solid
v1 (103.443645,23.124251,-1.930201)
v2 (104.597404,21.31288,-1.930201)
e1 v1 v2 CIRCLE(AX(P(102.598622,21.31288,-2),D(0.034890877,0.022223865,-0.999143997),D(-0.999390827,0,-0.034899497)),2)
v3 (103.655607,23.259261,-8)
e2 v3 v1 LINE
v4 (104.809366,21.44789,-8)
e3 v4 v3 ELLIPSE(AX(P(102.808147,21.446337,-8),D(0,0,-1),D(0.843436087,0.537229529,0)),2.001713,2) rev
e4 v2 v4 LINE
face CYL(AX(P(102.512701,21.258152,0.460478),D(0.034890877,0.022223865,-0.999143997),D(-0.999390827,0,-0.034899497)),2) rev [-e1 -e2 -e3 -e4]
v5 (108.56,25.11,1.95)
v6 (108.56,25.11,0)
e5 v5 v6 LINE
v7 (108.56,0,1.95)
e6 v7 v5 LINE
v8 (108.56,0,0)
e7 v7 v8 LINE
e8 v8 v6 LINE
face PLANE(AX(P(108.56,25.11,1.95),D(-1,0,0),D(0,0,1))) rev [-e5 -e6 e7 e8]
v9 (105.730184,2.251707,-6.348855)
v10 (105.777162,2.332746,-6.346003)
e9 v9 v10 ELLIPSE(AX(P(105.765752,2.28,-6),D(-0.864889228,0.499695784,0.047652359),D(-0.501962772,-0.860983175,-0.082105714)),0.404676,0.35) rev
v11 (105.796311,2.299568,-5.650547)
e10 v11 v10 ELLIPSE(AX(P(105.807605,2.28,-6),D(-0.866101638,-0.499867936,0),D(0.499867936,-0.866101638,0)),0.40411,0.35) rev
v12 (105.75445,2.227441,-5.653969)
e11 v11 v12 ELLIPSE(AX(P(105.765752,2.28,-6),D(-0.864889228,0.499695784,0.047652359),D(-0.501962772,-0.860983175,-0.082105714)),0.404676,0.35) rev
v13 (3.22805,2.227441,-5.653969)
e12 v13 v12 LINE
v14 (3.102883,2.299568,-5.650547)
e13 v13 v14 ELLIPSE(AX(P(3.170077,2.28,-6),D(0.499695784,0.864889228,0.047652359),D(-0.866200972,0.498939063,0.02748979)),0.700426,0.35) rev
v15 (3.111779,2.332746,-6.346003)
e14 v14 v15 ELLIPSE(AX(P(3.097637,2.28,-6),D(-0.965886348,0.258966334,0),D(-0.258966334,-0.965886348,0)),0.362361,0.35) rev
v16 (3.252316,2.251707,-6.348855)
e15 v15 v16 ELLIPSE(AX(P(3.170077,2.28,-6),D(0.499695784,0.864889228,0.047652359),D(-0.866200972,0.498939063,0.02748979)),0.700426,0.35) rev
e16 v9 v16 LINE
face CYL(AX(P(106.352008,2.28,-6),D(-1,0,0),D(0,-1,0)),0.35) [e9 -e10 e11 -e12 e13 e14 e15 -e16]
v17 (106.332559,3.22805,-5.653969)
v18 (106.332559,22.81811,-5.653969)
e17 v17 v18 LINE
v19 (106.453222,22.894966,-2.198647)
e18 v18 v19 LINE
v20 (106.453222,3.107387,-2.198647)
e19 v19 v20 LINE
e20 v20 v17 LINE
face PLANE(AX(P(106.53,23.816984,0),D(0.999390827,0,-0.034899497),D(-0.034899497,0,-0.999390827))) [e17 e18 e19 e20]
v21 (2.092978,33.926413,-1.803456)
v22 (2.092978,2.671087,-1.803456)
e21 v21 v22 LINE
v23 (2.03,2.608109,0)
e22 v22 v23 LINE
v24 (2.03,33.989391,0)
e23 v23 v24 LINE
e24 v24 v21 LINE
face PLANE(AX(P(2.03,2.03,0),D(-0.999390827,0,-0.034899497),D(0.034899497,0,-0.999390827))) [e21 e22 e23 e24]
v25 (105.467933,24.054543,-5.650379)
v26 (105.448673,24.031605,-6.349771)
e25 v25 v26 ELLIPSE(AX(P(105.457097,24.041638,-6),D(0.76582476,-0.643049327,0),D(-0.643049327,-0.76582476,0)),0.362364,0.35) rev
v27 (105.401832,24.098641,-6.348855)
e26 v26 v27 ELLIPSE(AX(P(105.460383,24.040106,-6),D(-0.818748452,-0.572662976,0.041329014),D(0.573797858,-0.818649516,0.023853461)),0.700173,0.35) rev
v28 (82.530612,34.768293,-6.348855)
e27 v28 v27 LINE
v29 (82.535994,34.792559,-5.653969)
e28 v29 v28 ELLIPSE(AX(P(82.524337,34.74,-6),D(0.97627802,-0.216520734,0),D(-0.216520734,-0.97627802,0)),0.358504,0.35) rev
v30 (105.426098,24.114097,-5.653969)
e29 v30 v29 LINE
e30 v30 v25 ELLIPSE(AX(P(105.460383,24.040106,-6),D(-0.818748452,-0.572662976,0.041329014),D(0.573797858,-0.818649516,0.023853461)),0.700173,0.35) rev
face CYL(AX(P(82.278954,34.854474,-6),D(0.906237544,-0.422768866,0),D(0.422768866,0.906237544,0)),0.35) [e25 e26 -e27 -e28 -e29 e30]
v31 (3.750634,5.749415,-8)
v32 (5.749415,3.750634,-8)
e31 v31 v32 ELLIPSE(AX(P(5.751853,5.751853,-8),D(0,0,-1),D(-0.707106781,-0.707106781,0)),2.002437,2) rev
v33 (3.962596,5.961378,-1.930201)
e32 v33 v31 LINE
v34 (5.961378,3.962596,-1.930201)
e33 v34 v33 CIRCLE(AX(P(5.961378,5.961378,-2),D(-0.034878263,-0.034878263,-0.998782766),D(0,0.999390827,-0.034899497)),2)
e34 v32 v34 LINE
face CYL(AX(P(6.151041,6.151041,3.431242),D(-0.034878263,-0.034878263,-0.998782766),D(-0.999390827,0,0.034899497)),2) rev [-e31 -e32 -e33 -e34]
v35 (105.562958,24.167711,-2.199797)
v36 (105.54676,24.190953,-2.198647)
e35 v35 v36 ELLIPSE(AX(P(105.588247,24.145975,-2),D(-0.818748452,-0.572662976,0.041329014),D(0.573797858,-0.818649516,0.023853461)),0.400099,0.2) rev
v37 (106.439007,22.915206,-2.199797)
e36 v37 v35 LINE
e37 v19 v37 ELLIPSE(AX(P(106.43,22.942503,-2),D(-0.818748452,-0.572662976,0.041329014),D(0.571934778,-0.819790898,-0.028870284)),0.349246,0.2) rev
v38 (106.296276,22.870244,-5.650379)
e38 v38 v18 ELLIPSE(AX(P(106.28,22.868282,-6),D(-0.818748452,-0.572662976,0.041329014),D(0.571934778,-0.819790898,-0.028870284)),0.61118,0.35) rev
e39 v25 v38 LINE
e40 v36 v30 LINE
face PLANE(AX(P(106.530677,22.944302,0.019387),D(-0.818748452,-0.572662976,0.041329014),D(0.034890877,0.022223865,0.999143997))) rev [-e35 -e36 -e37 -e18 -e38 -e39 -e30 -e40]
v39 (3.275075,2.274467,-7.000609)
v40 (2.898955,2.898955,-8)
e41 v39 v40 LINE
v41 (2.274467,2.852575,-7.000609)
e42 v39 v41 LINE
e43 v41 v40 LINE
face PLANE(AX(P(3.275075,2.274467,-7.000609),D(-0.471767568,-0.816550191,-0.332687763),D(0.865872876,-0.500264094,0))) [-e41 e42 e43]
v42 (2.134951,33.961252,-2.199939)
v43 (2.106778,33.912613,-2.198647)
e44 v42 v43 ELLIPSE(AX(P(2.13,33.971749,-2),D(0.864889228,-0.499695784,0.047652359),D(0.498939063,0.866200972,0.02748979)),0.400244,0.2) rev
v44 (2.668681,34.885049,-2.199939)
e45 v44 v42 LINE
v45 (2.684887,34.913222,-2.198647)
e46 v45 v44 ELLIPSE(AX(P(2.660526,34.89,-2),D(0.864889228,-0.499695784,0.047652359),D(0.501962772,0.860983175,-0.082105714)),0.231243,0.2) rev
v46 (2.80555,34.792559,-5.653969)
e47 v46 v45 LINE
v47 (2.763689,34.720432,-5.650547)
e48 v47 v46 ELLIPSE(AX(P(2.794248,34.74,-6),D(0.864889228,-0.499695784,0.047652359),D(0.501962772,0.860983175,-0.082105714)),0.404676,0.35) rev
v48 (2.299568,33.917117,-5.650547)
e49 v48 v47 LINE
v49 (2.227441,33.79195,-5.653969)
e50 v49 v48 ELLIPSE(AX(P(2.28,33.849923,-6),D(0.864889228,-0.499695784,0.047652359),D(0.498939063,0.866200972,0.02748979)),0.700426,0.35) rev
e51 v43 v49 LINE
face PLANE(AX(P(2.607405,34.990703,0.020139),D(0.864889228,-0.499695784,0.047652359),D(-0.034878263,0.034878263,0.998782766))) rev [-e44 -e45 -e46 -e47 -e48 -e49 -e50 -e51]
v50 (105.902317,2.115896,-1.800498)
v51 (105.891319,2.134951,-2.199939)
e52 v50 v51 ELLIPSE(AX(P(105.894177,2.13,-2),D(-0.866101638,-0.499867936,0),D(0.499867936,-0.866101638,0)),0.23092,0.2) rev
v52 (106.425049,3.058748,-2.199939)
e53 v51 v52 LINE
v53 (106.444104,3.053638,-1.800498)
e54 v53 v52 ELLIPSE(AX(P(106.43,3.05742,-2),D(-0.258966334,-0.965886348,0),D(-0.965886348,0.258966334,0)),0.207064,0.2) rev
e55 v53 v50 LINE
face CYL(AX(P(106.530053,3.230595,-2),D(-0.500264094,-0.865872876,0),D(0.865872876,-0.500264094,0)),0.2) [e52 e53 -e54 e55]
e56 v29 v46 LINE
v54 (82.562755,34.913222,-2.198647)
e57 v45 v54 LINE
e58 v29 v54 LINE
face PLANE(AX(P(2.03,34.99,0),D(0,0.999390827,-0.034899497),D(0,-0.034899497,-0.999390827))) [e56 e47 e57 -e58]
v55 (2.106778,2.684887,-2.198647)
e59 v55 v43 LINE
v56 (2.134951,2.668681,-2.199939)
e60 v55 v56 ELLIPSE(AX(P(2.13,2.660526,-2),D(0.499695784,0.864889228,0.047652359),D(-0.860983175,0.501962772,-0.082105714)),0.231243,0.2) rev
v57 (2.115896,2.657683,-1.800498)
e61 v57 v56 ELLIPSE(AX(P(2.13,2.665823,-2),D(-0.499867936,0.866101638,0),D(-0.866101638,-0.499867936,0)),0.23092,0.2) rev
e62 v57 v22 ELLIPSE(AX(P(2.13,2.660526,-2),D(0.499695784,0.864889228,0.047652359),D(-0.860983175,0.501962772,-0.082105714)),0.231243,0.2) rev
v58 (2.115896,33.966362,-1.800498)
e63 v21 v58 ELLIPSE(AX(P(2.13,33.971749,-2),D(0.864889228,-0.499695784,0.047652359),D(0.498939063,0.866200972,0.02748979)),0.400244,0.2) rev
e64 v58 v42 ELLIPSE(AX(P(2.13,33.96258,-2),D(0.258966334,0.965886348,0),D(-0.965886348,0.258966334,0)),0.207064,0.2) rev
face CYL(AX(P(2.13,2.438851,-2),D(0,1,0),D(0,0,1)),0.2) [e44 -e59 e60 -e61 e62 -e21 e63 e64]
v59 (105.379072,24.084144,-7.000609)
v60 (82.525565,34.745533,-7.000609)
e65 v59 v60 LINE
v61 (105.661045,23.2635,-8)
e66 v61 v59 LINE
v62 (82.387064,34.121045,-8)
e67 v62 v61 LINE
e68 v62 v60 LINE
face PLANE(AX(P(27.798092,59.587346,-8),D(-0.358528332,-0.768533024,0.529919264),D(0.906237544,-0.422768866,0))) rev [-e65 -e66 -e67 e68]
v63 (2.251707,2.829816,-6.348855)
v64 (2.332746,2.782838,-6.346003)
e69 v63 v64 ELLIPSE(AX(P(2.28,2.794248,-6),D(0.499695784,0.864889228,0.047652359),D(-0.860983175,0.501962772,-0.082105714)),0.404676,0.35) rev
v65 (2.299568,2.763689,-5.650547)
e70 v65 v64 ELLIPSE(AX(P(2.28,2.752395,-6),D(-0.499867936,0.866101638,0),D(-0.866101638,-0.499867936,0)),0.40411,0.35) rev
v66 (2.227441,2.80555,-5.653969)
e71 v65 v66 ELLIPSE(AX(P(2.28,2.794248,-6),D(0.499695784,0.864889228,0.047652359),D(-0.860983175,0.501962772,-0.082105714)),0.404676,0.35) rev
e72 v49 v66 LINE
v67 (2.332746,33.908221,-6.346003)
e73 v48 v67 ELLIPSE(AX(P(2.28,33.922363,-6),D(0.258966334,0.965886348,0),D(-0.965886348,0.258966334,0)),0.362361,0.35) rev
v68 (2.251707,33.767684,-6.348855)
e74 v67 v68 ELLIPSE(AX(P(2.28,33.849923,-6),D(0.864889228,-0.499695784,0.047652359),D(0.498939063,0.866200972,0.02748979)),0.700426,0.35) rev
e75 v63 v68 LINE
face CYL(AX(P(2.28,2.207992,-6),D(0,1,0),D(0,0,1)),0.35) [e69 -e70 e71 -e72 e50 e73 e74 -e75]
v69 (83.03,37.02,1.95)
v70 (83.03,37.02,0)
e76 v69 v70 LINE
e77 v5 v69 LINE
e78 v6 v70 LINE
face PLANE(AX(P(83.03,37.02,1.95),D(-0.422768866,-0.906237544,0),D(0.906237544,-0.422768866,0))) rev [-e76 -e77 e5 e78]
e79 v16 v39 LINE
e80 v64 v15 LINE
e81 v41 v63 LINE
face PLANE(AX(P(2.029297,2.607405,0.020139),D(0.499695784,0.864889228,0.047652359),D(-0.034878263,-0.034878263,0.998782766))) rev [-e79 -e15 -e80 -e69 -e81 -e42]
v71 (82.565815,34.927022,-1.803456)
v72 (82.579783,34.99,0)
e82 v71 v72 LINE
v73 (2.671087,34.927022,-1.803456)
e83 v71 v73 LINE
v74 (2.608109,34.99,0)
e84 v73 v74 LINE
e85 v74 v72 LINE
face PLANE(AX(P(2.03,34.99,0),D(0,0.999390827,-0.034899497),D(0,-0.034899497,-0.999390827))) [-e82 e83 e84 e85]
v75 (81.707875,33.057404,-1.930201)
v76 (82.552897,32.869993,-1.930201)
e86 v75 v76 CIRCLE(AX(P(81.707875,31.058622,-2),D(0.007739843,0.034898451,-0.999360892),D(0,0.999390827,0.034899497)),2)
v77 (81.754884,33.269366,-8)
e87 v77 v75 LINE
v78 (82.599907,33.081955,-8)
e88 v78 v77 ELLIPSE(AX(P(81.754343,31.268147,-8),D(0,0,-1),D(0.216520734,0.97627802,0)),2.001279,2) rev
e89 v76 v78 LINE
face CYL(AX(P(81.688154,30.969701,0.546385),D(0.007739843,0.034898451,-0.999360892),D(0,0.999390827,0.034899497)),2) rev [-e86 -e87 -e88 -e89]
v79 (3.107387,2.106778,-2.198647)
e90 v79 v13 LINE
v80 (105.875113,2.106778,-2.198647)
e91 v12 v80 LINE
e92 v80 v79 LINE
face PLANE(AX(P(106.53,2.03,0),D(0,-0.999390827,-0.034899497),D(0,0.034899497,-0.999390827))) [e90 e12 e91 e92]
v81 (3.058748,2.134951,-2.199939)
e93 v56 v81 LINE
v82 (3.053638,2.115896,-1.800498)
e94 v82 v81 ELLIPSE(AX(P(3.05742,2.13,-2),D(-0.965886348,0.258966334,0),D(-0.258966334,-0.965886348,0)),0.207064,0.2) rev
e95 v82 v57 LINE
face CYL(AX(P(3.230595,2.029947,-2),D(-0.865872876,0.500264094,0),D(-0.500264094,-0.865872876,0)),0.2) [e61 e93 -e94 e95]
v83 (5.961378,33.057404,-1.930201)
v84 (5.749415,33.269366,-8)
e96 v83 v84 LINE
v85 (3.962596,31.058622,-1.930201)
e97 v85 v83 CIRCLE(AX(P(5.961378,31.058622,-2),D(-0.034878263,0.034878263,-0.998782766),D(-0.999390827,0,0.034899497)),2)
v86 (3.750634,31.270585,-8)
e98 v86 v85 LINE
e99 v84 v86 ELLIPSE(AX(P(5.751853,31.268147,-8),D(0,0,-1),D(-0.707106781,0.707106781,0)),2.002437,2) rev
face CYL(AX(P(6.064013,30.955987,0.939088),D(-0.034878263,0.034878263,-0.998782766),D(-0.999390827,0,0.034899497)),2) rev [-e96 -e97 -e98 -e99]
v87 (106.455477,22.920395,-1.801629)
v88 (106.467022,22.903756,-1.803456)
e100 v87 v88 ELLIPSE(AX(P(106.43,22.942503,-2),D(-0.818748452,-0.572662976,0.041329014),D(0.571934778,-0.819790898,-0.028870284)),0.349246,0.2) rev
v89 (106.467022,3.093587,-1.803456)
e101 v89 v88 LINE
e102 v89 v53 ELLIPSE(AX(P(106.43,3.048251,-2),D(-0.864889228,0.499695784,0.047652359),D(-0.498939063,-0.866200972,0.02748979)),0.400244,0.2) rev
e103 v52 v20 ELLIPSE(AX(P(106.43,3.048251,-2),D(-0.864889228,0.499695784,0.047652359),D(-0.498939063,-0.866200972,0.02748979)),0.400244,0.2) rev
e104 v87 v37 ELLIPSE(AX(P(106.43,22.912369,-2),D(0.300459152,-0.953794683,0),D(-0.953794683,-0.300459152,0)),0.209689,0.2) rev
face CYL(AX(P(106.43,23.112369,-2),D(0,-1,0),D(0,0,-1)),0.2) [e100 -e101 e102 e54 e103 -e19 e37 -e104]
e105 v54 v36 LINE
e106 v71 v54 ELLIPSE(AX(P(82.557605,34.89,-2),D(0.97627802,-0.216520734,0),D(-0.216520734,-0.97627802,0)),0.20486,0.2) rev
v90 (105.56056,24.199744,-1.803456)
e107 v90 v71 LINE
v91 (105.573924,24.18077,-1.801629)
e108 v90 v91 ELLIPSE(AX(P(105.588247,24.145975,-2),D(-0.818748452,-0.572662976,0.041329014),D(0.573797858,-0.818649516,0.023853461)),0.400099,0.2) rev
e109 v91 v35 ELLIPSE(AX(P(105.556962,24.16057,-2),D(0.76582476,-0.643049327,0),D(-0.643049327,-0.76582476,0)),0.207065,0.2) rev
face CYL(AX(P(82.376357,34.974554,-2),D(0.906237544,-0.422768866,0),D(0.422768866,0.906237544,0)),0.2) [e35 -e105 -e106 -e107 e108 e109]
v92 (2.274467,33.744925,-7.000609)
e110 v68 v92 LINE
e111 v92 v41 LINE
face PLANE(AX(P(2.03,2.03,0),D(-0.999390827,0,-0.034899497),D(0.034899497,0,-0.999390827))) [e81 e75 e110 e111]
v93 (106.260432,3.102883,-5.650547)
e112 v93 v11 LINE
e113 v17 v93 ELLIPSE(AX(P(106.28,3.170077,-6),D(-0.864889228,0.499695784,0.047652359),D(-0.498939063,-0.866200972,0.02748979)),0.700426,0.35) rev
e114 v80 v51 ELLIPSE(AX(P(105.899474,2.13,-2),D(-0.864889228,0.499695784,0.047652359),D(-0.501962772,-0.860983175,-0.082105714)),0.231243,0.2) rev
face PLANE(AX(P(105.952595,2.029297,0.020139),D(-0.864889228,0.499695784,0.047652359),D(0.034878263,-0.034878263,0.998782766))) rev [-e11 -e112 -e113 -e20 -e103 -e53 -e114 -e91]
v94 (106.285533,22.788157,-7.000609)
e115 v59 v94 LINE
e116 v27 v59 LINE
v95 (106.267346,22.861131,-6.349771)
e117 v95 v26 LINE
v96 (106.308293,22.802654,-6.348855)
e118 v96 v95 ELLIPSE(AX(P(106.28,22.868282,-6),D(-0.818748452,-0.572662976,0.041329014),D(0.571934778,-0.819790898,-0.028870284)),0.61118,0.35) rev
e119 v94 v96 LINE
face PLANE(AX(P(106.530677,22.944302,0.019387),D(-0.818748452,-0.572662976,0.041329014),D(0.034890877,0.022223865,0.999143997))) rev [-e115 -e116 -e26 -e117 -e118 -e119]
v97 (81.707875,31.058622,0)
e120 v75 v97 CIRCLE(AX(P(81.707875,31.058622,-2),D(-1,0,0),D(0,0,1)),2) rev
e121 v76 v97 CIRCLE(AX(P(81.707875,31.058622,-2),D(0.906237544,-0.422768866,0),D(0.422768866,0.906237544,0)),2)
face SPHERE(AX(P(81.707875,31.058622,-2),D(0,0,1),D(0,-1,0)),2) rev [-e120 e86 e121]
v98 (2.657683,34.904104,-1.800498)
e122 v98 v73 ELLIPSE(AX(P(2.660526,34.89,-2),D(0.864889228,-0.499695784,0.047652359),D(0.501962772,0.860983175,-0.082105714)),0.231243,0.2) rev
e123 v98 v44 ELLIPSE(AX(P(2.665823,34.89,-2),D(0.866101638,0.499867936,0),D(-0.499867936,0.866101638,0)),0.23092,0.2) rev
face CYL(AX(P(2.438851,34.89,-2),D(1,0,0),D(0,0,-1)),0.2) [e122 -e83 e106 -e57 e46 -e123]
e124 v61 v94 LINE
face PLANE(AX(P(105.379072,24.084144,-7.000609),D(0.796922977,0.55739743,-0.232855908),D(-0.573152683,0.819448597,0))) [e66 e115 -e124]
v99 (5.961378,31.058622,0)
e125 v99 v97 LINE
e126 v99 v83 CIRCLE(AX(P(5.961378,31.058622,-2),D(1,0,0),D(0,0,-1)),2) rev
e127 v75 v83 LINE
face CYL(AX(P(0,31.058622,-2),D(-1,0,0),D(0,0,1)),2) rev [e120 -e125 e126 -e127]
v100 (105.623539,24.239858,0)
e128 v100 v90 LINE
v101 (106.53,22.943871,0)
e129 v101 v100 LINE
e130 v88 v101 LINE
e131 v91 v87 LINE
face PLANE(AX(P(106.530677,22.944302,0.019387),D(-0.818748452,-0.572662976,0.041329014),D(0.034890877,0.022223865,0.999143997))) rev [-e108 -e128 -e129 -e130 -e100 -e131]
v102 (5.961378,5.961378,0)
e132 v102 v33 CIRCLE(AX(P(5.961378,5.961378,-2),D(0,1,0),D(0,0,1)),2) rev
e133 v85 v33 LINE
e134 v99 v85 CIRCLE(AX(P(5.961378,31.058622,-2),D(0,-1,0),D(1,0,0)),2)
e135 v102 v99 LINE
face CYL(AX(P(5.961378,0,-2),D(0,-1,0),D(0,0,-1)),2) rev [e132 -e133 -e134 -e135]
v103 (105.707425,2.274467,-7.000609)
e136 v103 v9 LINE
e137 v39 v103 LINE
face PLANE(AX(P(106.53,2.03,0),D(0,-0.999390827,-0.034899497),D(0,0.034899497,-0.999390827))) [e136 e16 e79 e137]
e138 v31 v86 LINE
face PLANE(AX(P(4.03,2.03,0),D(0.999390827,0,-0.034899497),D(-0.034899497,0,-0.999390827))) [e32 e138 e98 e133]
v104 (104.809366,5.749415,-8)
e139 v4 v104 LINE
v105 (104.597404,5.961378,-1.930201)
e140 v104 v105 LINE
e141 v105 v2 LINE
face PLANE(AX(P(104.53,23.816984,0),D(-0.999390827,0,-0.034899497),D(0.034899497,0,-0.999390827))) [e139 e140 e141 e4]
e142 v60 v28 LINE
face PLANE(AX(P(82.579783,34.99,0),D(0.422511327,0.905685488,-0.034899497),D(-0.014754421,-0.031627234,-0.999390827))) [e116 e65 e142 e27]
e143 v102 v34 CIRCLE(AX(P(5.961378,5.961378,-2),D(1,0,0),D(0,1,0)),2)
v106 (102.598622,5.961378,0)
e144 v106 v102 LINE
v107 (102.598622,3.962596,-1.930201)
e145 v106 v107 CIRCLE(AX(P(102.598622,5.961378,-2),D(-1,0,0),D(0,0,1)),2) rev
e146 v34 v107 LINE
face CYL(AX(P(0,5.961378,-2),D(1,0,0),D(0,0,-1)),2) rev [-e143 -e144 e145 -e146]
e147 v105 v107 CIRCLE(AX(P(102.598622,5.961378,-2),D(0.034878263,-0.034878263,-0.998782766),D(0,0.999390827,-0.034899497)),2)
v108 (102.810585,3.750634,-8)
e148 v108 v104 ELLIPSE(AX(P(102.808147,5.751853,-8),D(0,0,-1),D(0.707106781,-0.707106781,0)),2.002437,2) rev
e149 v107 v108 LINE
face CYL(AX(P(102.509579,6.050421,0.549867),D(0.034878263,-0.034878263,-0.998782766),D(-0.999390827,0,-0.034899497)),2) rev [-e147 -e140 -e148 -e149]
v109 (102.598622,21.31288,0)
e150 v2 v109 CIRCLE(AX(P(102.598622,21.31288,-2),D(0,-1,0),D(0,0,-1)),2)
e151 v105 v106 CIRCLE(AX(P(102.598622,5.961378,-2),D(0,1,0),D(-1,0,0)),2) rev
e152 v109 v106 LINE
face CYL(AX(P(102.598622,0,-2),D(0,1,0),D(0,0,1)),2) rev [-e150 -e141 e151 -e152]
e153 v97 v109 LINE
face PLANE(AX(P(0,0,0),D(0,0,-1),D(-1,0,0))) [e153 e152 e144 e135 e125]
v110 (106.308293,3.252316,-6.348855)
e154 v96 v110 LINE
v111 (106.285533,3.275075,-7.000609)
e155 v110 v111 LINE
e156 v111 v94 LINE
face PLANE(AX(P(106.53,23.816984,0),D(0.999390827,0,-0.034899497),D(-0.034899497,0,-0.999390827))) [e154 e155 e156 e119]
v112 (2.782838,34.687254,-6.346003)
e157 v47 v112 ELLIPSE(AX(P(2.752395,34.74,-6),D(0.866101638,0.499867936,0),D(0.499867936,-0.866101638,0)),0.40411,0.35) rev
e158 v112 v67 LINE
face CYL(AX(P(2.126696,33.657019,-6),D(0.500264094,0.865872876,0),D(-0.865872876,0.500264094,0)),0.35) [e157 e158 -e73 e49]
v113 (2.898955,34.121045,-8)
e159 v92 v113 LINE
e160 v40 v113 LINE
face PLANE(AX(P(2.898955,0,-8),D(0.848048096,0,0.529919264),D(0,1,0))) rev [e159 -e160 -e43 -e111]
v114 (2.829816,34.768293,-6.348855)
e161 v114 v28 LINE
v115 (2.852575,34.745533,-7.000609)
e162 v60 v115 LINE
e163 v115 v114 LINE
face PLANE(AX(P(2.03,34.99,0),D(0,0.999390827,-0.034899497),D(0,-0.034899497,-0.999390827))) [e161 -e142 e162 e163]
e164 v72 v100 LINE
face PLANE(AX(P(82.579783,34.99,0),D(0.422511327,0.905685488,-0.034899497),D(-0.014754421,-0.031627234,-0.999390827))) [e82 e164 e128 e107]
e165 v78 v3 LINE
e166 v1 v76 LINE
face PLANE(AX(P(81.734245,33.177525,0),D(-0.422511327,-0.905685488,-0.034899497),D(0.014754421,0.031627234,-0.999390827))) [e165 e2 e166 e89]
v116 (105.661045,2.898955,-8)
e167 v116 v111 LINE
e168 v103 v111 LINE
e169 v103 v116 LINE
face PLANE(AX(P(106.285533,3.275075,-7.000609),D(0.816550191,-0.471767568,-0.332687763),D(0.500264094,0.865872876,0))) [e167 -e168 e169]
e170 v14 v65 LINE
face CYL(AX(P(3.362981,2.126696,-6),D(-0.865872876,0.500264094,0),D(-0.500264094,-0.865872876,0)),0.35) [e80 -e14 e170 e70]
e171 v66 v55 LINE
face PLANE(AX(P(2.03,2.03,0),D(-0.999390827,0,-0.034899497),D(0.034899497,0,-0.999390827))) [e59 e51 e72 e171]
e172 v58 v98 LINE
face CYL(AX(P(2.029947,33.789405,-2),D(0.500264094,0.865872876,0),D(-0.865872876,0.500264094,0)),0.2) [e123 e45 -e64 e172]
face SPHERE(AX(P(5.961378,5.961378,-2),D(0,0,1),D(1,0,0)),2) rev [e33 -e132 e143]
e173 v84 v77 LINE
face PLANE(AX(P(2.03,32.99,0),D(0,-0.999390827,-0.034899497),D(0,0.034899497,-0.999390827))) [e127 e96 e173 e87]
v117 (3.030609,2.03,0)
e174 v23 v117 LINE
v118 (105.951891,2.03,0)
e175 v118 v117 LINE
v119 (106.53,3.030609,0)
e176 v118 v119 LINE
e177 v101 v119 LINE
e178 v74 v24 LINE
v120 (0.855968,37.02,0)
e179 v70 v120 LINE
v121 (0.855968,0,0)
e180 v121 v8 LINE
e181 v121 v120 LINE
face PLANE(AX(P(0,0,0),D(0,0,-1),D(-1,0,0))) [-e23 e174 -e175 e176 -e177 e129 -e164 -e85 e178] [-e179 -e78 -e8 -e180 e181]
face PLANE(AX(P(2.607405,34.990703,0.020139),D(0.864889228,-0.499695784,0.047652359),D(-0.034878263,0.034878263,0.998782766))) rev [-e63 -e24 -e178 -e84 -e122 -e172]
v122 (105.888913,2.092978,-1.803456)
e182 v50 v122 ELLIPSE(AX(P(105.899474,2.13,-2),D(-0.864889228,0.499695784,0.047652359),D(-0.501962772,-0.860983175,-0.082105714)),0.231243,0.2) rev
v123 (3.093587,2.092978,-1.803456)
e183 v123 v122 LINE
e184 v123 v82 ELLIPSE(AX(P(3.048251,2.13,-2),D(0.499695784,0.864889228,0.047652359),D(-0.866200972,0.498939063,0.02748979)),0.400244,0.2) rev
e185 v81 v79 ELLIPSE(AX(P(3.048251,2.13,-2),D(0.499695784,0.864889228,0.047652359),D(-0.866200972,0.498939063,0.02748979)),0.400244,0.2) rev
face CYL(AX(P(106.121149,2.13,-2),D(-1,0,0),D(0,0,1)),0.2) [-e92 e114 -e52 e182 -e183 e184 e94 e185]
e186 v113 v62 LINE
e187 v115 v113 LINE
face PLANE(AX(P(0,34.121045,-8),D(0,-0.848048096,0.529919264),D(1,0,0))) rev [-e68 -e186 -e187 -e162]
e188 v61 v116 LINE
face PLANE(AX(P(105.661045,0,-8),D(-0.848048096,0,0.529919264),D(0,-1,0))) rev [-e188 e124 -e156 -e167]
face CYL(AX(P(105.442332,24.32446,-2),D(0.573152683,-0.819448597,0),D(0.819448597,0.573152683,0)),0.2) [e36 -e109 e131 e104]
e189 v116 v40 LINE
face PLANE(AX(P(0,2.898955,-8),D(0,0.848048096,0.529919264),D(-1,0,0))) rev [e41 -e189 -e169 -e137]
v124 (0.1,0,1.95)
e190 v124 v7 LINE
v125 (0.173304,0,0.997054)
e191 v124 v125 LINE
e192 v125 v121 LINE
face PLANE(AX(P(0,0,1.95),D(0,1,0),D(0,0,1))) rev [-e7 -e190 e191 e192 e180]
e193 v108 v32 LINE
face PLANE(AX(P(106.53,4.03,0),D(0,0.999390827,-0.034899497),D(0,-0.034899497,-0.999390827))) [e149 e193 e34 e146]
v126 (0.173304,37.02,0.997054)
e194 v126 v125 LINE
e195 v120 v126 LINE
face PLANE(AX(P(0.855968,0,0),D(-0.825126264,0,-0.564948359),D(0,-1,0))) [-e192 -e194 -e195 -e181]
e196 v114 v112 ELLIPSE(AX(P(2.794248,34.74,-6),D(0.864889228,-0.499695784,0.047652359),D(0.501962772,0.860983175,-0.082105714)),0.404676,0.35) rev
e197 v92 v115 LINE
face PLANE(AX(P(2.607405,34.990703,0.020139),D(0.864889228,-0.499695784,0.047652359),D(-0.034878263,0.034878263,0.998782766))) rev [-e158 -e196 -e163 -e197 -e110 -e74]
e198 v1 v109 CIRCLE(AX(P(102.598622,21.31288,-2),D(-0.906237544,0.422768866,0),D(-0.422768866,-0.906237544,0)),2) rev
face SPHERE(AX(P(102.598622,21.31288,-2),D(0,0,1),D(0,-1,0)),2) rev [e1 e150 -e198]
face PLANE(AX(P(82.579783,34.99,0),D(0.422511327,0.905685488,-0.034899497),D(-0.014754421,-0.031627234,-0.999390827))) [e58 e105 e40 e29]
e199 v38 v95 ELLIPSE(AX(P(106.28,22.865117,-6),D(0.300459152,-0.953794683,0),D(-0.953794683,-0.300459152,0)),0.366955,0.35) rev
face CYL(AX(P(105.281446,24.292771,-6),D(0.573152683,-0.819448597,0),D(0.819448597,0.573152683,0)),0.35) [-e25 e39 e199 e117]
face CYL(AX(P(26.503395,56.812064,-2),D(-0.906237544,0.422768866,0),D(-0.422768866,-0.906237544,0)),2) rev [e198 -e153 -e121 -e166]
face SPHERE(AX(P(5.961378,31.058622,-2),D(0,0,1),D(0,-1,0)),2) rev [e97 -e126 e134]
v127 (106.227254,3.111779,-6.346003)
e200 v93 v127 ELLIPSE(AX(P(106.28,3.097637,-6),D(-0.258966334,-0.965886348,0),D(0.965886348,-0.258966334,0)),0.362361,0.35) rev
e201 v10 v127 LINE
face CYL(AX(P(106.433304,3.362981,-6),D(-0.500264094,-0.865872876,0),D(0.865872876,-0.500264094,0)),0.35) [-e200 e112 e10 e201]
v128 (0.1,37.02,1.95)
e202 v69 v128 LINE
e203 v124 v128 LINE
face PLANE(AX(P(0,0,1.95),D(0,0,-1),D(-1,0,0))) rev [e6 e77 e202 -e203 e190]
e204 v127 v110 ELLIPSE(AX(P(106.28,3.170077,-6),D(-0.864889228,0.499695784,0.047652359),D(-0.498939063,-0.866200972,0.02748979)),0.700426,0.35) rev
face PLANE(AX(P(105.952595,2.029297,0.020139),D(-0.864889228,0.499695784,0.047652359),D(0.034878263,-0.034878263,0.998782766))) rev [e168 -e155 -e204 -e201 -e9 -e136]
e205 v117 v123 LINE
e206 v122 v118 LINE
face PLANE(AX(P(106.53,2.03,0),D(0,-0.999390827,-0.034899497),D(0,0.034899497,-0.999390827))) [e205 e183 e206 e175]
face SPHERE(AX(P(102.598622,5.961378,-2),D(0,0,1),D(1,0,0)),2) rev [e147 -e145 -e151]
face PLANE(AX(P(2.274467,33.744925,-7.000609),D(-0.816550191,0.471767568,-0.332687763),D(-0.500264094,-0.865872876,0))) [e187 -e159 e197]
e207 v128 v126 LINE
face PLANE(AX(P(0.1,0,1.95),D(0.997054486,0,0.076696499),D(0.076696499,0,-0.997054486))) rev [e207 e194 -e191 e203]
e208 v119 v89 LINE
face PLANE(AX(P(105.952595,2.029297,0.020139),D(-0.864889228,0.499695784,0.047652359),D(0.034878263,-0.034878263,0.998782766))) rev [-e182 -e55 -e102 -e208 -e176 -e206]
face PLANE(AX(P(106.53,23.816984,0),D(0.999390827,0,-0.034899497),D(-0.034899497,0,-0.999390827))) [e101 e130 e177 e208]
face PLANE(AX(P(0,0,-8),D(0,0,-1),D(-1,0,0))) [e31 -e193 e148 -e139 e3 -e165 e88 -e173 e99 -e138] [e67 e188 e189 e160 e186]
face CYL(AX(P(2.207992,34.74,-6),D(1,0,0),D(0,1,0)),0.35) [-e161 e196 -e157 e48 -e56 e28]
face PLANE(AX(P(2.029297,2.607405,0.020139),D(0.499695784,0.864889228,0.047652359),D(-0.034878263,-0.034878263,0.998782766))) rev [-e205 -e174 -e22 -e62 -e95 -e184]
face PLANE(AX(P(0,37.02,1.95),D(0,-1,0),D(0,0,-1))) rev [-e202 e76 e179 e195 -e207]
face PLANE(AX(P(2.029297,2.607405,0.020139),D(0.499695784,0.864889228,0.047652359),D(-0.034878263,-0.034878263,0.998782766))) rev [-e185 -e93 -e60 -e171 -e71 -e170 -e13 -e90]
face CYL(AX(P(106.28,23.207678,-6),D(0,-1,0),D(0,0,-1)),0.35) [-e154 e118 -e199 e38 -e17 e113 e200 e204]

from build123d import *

# Parameters (mm, degrees)
BOSS_EXTRUDE1_DEPTH = 1.95
EXTRUDE_THIN1_DEPTH = 8
EXTRUDE_THIN1_DRAFT = 2
CUT_EXTRUDE1_DEPTH  = 115.977189042
FILLET1_R           = 2
SWEEP4_PROFILE_R    = 0.35
SWEEP5_PROFILE_R    = 0.2


with BuildPart() as part:
    # Sketch1 → Boss-Extrude1 (new body)
    with BuildSketch(Plane.XY):
        Polygon((0, 0), (0, 37.02), (83.03, 37.02), (108.56, 25.11), (108.56, 0), align=None)
    extrude(amount=BOSS_EXTRUDE1_DEPTH)


with BuildPart() as extrude_thin1_tool:
    # Sketch2 → Extrude-Thin1 (with draft: the straight prism first)
    with BuildSketch(Plane(origin=(0, 0, 0), x_dir=(-1, 0, 0), z_dir=(0, 0, -1))):
        Polygon((-106.53, 2.03), (-2.03, 2.03), (-2.03, 34.99), (-82.579782869, 34.99), (-106.53, 23.816984488), align=None)
        Polygon((-104.53, 4.03), (-4.03, 4.03), (-4.03, 32.99), (-82.136219193, 32.99), (-104.53, 22.543077579), align=None, mode=Mode.SUBTRACT)
    extrude(amount=EXTRUDE_THIN1_DEPTH)
    # Extrude-Thin1: the draft: its side faces are tilted about the plane it starts from
    extrude_thin1_sides = [extrude_thin1_tool.faces().sort_by_distance(p)[0] for p in [
        (54.28, 2.03, -4),
        (2.03, 18.51, -4),
        (42.304891435, 34.99, -4),
        (94.554891435, 29.403492244, -4),
        (106.53, 12.923492244, -4),
        (104.53, 13.286538789, -4),
        (93.333109597, 27.766538789, -4),
        (43.083109597, 32.99, -4),
        (4.03, 18.51, -4),
        (54.28, 4.03, -4),
    ]]
    draft(extrude_thin1_sides, Plane(origin=(0, 0, 0), x_dir=(-1, 0, 0), z_dir=(0, 0, -1)), EXTRUDE_THIN1_DRAFT)


with BuildPart() as part_1:
    add(part.part)

    # Extrude-Thin1: add extrude_thin1_tool
    add(extrude_thin1_tool.part)

    # Sketch3 → Cut-Extrude1 (cut, through all)
    with BuildSketch(Plane(origin=(0, 37.02, 0), x_dir=(1, 0, 0), z_dir=(0, 1, 0))):
        Polygon((0, -1.95), (0.1, -1.95), (0.25, 0), (0, 0), align=None)
    extrude(amount=-CUT_EXTRUDE1_DEPTH, mode=Mode.SUBTRACT)

    # Fillet1
    fillet1_edges = [part_1.edges().sort_by_distance(p)[0] for p in [
        (104.53, 13.286538789, 0),
        (54.28, 4.03, 0),
        (4.03, 18.51, 0),
        (43.083109597, 32.99, 0),
        (93.333109597, 27.766538789, 0),
        (104.669683078, 3.890316922, -4),
        (3.890316922, 3.890316922, -4),
        (3.890316922, 33.129683078, -4),
        (82.167198363, 33.129683078, -4),
        (104.669683078, 22.632049198, -4),
    ]]
    fillet(fillet1_edges, radius=FILLET1_R)

    # Chamfer1
    # the kernel refuses this chamfer: 1, 0.87289825, 0.605967864, 0.589589202, 0.577756975 mm, written as the material it takes off along each edge
    with BuildSketch(Plane(origin=(105.775216634, 23.378600332, -7.333739449), x_dir=(-0.21304506320944425, 0.6200388912519721, 0.7550917655339046), z_dir=(0.7969229766736515, 0.5573974303176954, -0.23285590807371978))) as chamfer1_piece_1:
        Polygon((-0.550130529, -0.409319885), (0.773405063, -0.409319885), (-0.223274534, 0.818639769), align=None)
    extrude(amount=0.747100973, mode=Mode.SUBTRACT)
    with BuildSketch(Plane(origin=(105.884667536, 2.816165826, -7.333739449), x_dir=(0.0393259866782338, -0.5295093368050788, 0.8473920751387924), z_dir=(0.8165501905229234, -0.47176756829689104, -0.3326877633160196))) as chamfer1_piece_2:
        Polygon((-0.617215932, 0.346134252), (0.56215647, 0.346134252), (0.055059462, -0.692268505), align=None)
    extrude(amount=0.835536063, mode=Mode.SUBTRACT)
    with BuildSketch(Plane(origin=(2.816165826, 2.675332464, -7.333739449), x_dir=(0.3040517824810945, -0.5048305049346018, 0.8078976883600696), z_dir=(-0.471767568296886, -0.8165501905229261, -0.33268776331602)), Plane(origin=(2.675332464, 34.203834174, -7.333739449), x_dir=(-0.5048305049346006, -0.30405178248109604, 0.8078976883600698), z_dir=(-0.8165501905229273, 0.47176756829688477, -0.3326877633160189))) as chamfer1_piece_3:
        Polygon((-0.625989713, -0.33000198), (0.611036759, -0.33000198), (0.014952954, 0.660003959), align=None)
    extrude(amount=0.835536063, mode=Mode.SUBTRACT)
    with BuildSketch(Plane(origin=(106.250633844, 26.226127004, -8), x_dir=(-1, 0, 0), z_dir=(0, -1, 0))) as chamfer1_piece_4:
        with BuildLine():
            Line((0.610785972, 0.033921924), (-0.056096267, -1.033312751))
            Line((-0.056096267, -1.033312751), (-0.076084084, -1.032614761))
            ThreePointArc((-0.076084084, -1.032614761), (-0.038042042, -0.51630738), (-0.019987817, 0.00069799))
            Line((-0.019987817, 0.00069799), (0, 0.02))
            ThreePointArc((0, 0.02), (0.305392986, 0.02), (0.610785972, 0.053921924))
            Line((0.610785972, 0.053921924), (0.610785972, 0.033921924))
        make_face()
    extrude(amount=26.503846603, mode=Mode.SUBTRACT)
    with BuildSketch(Plane(origin=(108.837719599, 2.309366156, -8), x_dir=(0, 1, 0), z_dir=(-1, 0, 0))) as chamfer1_piece_5:
        with BuildLine():
            Line((0.610785972, 0.033921924), (-0.056096267, -1.033312751))
            Line((-0.056096267, -1.033312751), (-0.076084084, -1.032614761))
            ThreePointArc((-0.076084084, -1.032614761), (-0.038042042, -0.51630738), (-0.019987817, 0.00069799))
            Line((-0.019987817, 0.00069799), (0, 0.02))
            ThreePointArc((0, 0.02), (0.305392986, 0.02), (0.610785972, 0.053921924))
            Line((0.610785972, 0.053921924), (0.610785972, 0.033921924))
        make_face()
    extrude(amount=109.115439197, mode=Mode.SUBTRACT)
    with BuildSketch(Plane(origin=(2.309366156, -0.277719599, -8), x_dir=(1, 0, 0), z_dir=(0, 1, 0))) as chamfer1_piece_6:
        with BuildLine():
            Line((0.610785972, 0.033921924), (-0.056096267, -1.033312751))
            Line((-0.056096267, -1.033312751), (-0.076084084, -1.032614761))
            ThreePointArc((-0.076084084, -1.032614761), (-0.038042042, -0.51630738), (-0.019987817, 0.00069799))
            Line((-0.019987817, 0.00069799), (0, 0.02))
            ThreePointArc((0, 0.02), (0.305392986, 0.02), (0.610785972, 0.053921924))
            Line((0.610785972, 0.053921924), (0.610785972, 0.033921924))
        make_face()
    extrude(amount=37.575439197, mode=Mode.SUBTRACT)
    with BuildSketch(Plane(origin=(-0.277719599, 34.710633844, -8), x_dir=(0, -1, 0), z_dir=(1, 0, 0))) as chamfer1_piece_7:
        with BuildLine():
            Line((0.610785972, 0.033921924), (-0.056096267, -1.033312751))
            Line((-0.056096267, -1.033312751), (-0.076084084, -1.032614761))
            ThreePointArc((-0.076084084, -1.032614761), (-0.038042042, -0.51630738), (-0.019987817, 0.00069799))
            Line((-0.019987817, 0.00069799), (0, 0.02))
            ThreePointArc((0, 0.02), (0.305392986, 0.02), (0.610785972, 0.053921924))
            Line((0.610785972, 0.053921924), (0.610785972, 0.033921924))
        make_face()
    extrude(amount=85.382629883, mode=Mode.SUBTRACT)
    with BuildSketch(Plane(origin=(80.173310289, 35.804373155, -8), x_dir=(-0.4227688659566774, -0.9062375439020968, 0), z_dir=(0.9062375439020969, -0.4227688659566774, 0))) as chamfer1_piece_8:
        with BuildLine():
            Line((0.610785972, 0.033921924), (-0.056096267, -1.033312751))
            Line((-0.056096267, -1.033312751), (-0.076084084, -1.032614761))
            ThreePointArc((-0.076084084, -1.032614761), (-0.038042042, -0.51630738), (-0.019987817, 0.00069799))
            Line((-0.019987817, 0.00069799), (0, 0.02))
            ThreePointArc((0, 0.02), (0.305392986, 0.02), (0.610785972, 0.053921924))
            Line((0.610785972, 0.053921924), (0.610785972, 0.033921924))
        make_face()
    extrude(amount=31.362458978, mode=Mode.SUBTRACT)
    with BuildSketch(Plane(origin=(106.620265691, 23.874479532, 2.584871201), x_dir=(-0.9056858205769407, 0.4233673296311047, 0.02221032658249641), z_dir=(-0.034890877204488725, -0.022223864760439818, -0.9991439968908441))) as chamfer1_piece_9_section:
        with BuildLine():
            Line((1.034641016, 0.02), (-0.404288913, -0.810766582))
            Line((-0.404288913, -0.810766582), (-0.422407098, -0.802297144))
            ThreePointArc((-0.422407098, -0.802297144), (-0.209884464, -0.401765185), (-0.018118185, 0.008469438))
            Line((-0.018118185, 0.008469438), (0, 0.02))
            ThreePointArc((0, 0.02), (0.517320508, 0.02), (1.034641016, 0.04))
            Line((1.034641016, 0.04), (1.034641016, 0.02))
        make_face()
    chamfer1_piece_9 = extrude(amount=13.181025401, mode=Mode.PRIVATE)
    chamfer1_piece_9 = split(chamfer1_piece_9, bisect_by=Plane(origin=(106.620265691, 23.874479532, 0), z_dir=(0, 0, -1)), keep=Keep.TOP, mode=Mode.PRIVATE)
    add(chamfer1_piece_9, mode=Mode.SUBTRACT)
    with BuildSketch(Plane(origin=(106.620233057, 1.939766943, 2.583936666), x_dir=(-0.9993915682994698, -0.001217233815563483, 0.03485701584709124), z_dir=(-0.03487826274237467, 0.03487826274237467, -0.9987827659587183))) as chamfer1_piece_10_section:
        with BuildLine():
            Line((0.597799152, -0.034616631), (-0.021260152, 1.034615889))
            Line((-0.021260152, 1.034615889), (-0.041260137, 1.03459153))
            ThreePointArc((-0.041260137, 1.03459153), (-0.020630069, 0.517295765), (-0.019999985, -2.4359e-05))
            Line((-0.019999985, -2.4359e-05), (0, -0.02))
            ThreePointArc((0, -0.02), (0.298899576, -0.02), (0.597799152, -0.054616631))
            Line((0.597799152, -0.054616631), (0.597799152, -0.034616631))
        make_face()
    chamfer1_piece_10 = extrude(amount=13.183921249, mode=Mode.PRIVATE)
    chamfer1_piece_10 = split(chamfer1_piece_10, bisect_by=Plane(origin=(106.620233057, 1.939766943, 0), z_dir=(0, 0, -1)), keep=Keep.TOP, mode=Mode.PRIVATE)
    add(chamfer1_piece_10, mode=Mode.SUBTRACT)
    with BuildSketch(Plane(origin=(1.939766943, 1.939766943, 2.583936666), x_dir=(0.9993915682994698, -0.0012172338155664961, 0.03485701584709113), z_dir=(0.03487826274237467, 0.03487826274237467, -0.9987827659587183))) as chamfer1_piece_11_section:
        with BuildLine():
            Line((1.034641016, 0.02), (-0.03534471, -0.597756547))
            Line((-0.03534471, -0.597756547), (-0.055344695, -0.597732187))
            ThreePointArc((-0.055344695, -0.597732187), (-0.020364037, -0.298874995), (-0.019999985, 2.4359e-05))
            Line((-0.019999985, 2.4359e-05), (0, 0.02))
            ThreePointArc((0, 0.02), (0.517320508, 0.02), (1.034641016, 0.04))
            Line((1.034641016, 0.04), (1.034641016, 0.02))
        make_face()
    chamfer1_piece_11 = extrude(amount=13.183921249, mode=Mode.PRIVATE)
    chamfer1_piece_11 = split(chamfer1_piece_11, bisect_by=Plane(origin=(1.939766943, 1.939766943, 0), z_dir=(0, 0, -1)), keep=Keep.TOP, mode=Mode.PRIVATE)
    add(chamfer1_piece_11, mode=Mode.SUBTRACT)
    with BuildSketch(Plane(origin=(1.939766943, 35.080233057, 2.583936666), x_dir=(-0.001217233815566496, -0.9993915682994698, 0.03485701584709113), z_dir=(0.03487826274237467, -0.03487826274237467, -0.9987827659587183))) as chamfer1_piece_12_section:
        with BuildLine():
            Line((1.034641016, 0.02), (-0.03534471, -0.597756547))
            Line((-0.03534471, -0.597756547), (-0.055344695, -0.597732187))
            ThreePointArc((-0.055344695, -0.597732187), (-0.020364037, -0.298874995), (-0.019999985, 2.4359e-05))
            Line((-0.019999985, 2.4359e-05), (0, 0.02))
            ThreePointArc((0, 0.02), (0.517320508, 0.02), (1.034641016, 0.04))
            Line((1.034641016, 0.04), (1.034641016, 0.02))
        make_face()
    chamfer1_piece_12 = extrude(amount=13.183921249, mode=Mode.PRIVATE)
    chamfer1_piece_12 = split(chamfer1_piece_12, bisect_by=Plane(origin=(1.939766943, 35.080233057, 0), z_dir=(0, 0, -1)), keep=Keep.TOP, mode=Mode.PRIVATE)
    add(chamfer1_piece_12, mode=Mode.SUBTRACT)
    with BuildSketch(Plane(origin=(0.25, 39.607085755, 0), x_dir=(1, 0, 0), z_dir=(0, -1, 0))) as chamfer1_piece_13:
        with BuildLine():
            Line((0.628565799, -0.033005051), (-0.099294433, 1.030059536))
            Line((-0.099294433, 1.030059536), (-0.119235523, 1.028525606))
            ThreePointArc((-0.119235523, 1.028525606), (-0.059617761, 0.514262803), (-0.01994109, -0.00153393))
            Line((-0.01994109, -0.00153393), (0, -0.02))
            ThreePointArc((0, -0.02), (0.314282899, -0.02), (0.628565799, -0.053005051))
            Line((0.628565799, -0.053005051), (0.628565799, -0.033005051))
        make_face()
    extrude(amount=42.194171509, mode=Mode.SUBTRACT)

    # Sweep4: sweep along a path in Sketch13
    with BuildLine(Plane(origin=(0, 0, -6), x_dir=(-1, 0, 0), z_dir=(0, 0, -1))) as sweep4_path:
        Line((-2.752395457, 34.74), (-82.52433741, 34.74))
        Line((-82.52433741, 34.74), (-105.457097335, 24.041638437))
        Line((-105.457097335, 24.041638437), (-106.28, 22.865116971))
        Line((-106.28, 22.865116971), (-106.28, 3.097636961))
        Line((-106.28, 3.097636961), (-105.807604543, 2.28))
        Line((-105.807604543, 2.28), (-3.097636961, 2.28))
        Line((-3.097636961, 2.28), (-2.28, 2.752395457))
        Line((-2.28, 2.752395457), (-2.28, 33.922363039))
        Line((-2.28, 33.922363039), (-2.752395457, 34.74))
    # Sweep4 profile (on start of the path) → Sweep4 (sweep)
    with BuildSketch(Plane(origin=(2.752395457, 34.74, -6), x_dir=(0, 1, 0), z_dir=(1, 0, 0))):
        Circle(SWEEP4_PROFILE_R)
    sweep(path=sweep4_path.line, transition=Transition.RIGHT)

    # Sweep5: sweep along a path in Sketch37
    with BuildLine(Plane(origin=(0, 0, -2), x_dir=(-1, 0, 0), z_dir=(0, 0, -1))) as sweep5_path:
        Line((-3.057420066, 2.13), (-2.13, 2.665823412))
        Line((-2.13, 2.665823412), (-2.13, 33.962579934))
        Line((-2.13, 33.962579934), (-2.665823412, 34.89))
        Line((-2.665823412, 34.89), (-82.557604685, 34.89))
        Line((-82.557604685, 34.89), (-105.556962081, 24.160570052))
        Line((-105.556962081, 24.160570052), (-106.43, 22.912369146))
        Line((-106.43, 22.912369146), (-106.43, 3.057420066))
        Line((-106.43, 3.057420066), (-105.894176588, 2.13))
        Line((-105.894176588, 2.13), (-3.057420066, 2.13))
    # Sweep5 profile (on start of the path) → Sweep5 (sweep)
    with BuildSketch(Plane(origin=(3.057420066, 2.13, -2), x_dir=(-0.5002640936209776, -0.8658728755617546, 0), z_dir=(-0.8658728755617546, 0.5002640936209776, 0))):
        Circle(SWEEP5_PROFILE_R)
    sweep(path=sweep5_path.line, transition=Transition.RIGHT)


solid = part_1.part
